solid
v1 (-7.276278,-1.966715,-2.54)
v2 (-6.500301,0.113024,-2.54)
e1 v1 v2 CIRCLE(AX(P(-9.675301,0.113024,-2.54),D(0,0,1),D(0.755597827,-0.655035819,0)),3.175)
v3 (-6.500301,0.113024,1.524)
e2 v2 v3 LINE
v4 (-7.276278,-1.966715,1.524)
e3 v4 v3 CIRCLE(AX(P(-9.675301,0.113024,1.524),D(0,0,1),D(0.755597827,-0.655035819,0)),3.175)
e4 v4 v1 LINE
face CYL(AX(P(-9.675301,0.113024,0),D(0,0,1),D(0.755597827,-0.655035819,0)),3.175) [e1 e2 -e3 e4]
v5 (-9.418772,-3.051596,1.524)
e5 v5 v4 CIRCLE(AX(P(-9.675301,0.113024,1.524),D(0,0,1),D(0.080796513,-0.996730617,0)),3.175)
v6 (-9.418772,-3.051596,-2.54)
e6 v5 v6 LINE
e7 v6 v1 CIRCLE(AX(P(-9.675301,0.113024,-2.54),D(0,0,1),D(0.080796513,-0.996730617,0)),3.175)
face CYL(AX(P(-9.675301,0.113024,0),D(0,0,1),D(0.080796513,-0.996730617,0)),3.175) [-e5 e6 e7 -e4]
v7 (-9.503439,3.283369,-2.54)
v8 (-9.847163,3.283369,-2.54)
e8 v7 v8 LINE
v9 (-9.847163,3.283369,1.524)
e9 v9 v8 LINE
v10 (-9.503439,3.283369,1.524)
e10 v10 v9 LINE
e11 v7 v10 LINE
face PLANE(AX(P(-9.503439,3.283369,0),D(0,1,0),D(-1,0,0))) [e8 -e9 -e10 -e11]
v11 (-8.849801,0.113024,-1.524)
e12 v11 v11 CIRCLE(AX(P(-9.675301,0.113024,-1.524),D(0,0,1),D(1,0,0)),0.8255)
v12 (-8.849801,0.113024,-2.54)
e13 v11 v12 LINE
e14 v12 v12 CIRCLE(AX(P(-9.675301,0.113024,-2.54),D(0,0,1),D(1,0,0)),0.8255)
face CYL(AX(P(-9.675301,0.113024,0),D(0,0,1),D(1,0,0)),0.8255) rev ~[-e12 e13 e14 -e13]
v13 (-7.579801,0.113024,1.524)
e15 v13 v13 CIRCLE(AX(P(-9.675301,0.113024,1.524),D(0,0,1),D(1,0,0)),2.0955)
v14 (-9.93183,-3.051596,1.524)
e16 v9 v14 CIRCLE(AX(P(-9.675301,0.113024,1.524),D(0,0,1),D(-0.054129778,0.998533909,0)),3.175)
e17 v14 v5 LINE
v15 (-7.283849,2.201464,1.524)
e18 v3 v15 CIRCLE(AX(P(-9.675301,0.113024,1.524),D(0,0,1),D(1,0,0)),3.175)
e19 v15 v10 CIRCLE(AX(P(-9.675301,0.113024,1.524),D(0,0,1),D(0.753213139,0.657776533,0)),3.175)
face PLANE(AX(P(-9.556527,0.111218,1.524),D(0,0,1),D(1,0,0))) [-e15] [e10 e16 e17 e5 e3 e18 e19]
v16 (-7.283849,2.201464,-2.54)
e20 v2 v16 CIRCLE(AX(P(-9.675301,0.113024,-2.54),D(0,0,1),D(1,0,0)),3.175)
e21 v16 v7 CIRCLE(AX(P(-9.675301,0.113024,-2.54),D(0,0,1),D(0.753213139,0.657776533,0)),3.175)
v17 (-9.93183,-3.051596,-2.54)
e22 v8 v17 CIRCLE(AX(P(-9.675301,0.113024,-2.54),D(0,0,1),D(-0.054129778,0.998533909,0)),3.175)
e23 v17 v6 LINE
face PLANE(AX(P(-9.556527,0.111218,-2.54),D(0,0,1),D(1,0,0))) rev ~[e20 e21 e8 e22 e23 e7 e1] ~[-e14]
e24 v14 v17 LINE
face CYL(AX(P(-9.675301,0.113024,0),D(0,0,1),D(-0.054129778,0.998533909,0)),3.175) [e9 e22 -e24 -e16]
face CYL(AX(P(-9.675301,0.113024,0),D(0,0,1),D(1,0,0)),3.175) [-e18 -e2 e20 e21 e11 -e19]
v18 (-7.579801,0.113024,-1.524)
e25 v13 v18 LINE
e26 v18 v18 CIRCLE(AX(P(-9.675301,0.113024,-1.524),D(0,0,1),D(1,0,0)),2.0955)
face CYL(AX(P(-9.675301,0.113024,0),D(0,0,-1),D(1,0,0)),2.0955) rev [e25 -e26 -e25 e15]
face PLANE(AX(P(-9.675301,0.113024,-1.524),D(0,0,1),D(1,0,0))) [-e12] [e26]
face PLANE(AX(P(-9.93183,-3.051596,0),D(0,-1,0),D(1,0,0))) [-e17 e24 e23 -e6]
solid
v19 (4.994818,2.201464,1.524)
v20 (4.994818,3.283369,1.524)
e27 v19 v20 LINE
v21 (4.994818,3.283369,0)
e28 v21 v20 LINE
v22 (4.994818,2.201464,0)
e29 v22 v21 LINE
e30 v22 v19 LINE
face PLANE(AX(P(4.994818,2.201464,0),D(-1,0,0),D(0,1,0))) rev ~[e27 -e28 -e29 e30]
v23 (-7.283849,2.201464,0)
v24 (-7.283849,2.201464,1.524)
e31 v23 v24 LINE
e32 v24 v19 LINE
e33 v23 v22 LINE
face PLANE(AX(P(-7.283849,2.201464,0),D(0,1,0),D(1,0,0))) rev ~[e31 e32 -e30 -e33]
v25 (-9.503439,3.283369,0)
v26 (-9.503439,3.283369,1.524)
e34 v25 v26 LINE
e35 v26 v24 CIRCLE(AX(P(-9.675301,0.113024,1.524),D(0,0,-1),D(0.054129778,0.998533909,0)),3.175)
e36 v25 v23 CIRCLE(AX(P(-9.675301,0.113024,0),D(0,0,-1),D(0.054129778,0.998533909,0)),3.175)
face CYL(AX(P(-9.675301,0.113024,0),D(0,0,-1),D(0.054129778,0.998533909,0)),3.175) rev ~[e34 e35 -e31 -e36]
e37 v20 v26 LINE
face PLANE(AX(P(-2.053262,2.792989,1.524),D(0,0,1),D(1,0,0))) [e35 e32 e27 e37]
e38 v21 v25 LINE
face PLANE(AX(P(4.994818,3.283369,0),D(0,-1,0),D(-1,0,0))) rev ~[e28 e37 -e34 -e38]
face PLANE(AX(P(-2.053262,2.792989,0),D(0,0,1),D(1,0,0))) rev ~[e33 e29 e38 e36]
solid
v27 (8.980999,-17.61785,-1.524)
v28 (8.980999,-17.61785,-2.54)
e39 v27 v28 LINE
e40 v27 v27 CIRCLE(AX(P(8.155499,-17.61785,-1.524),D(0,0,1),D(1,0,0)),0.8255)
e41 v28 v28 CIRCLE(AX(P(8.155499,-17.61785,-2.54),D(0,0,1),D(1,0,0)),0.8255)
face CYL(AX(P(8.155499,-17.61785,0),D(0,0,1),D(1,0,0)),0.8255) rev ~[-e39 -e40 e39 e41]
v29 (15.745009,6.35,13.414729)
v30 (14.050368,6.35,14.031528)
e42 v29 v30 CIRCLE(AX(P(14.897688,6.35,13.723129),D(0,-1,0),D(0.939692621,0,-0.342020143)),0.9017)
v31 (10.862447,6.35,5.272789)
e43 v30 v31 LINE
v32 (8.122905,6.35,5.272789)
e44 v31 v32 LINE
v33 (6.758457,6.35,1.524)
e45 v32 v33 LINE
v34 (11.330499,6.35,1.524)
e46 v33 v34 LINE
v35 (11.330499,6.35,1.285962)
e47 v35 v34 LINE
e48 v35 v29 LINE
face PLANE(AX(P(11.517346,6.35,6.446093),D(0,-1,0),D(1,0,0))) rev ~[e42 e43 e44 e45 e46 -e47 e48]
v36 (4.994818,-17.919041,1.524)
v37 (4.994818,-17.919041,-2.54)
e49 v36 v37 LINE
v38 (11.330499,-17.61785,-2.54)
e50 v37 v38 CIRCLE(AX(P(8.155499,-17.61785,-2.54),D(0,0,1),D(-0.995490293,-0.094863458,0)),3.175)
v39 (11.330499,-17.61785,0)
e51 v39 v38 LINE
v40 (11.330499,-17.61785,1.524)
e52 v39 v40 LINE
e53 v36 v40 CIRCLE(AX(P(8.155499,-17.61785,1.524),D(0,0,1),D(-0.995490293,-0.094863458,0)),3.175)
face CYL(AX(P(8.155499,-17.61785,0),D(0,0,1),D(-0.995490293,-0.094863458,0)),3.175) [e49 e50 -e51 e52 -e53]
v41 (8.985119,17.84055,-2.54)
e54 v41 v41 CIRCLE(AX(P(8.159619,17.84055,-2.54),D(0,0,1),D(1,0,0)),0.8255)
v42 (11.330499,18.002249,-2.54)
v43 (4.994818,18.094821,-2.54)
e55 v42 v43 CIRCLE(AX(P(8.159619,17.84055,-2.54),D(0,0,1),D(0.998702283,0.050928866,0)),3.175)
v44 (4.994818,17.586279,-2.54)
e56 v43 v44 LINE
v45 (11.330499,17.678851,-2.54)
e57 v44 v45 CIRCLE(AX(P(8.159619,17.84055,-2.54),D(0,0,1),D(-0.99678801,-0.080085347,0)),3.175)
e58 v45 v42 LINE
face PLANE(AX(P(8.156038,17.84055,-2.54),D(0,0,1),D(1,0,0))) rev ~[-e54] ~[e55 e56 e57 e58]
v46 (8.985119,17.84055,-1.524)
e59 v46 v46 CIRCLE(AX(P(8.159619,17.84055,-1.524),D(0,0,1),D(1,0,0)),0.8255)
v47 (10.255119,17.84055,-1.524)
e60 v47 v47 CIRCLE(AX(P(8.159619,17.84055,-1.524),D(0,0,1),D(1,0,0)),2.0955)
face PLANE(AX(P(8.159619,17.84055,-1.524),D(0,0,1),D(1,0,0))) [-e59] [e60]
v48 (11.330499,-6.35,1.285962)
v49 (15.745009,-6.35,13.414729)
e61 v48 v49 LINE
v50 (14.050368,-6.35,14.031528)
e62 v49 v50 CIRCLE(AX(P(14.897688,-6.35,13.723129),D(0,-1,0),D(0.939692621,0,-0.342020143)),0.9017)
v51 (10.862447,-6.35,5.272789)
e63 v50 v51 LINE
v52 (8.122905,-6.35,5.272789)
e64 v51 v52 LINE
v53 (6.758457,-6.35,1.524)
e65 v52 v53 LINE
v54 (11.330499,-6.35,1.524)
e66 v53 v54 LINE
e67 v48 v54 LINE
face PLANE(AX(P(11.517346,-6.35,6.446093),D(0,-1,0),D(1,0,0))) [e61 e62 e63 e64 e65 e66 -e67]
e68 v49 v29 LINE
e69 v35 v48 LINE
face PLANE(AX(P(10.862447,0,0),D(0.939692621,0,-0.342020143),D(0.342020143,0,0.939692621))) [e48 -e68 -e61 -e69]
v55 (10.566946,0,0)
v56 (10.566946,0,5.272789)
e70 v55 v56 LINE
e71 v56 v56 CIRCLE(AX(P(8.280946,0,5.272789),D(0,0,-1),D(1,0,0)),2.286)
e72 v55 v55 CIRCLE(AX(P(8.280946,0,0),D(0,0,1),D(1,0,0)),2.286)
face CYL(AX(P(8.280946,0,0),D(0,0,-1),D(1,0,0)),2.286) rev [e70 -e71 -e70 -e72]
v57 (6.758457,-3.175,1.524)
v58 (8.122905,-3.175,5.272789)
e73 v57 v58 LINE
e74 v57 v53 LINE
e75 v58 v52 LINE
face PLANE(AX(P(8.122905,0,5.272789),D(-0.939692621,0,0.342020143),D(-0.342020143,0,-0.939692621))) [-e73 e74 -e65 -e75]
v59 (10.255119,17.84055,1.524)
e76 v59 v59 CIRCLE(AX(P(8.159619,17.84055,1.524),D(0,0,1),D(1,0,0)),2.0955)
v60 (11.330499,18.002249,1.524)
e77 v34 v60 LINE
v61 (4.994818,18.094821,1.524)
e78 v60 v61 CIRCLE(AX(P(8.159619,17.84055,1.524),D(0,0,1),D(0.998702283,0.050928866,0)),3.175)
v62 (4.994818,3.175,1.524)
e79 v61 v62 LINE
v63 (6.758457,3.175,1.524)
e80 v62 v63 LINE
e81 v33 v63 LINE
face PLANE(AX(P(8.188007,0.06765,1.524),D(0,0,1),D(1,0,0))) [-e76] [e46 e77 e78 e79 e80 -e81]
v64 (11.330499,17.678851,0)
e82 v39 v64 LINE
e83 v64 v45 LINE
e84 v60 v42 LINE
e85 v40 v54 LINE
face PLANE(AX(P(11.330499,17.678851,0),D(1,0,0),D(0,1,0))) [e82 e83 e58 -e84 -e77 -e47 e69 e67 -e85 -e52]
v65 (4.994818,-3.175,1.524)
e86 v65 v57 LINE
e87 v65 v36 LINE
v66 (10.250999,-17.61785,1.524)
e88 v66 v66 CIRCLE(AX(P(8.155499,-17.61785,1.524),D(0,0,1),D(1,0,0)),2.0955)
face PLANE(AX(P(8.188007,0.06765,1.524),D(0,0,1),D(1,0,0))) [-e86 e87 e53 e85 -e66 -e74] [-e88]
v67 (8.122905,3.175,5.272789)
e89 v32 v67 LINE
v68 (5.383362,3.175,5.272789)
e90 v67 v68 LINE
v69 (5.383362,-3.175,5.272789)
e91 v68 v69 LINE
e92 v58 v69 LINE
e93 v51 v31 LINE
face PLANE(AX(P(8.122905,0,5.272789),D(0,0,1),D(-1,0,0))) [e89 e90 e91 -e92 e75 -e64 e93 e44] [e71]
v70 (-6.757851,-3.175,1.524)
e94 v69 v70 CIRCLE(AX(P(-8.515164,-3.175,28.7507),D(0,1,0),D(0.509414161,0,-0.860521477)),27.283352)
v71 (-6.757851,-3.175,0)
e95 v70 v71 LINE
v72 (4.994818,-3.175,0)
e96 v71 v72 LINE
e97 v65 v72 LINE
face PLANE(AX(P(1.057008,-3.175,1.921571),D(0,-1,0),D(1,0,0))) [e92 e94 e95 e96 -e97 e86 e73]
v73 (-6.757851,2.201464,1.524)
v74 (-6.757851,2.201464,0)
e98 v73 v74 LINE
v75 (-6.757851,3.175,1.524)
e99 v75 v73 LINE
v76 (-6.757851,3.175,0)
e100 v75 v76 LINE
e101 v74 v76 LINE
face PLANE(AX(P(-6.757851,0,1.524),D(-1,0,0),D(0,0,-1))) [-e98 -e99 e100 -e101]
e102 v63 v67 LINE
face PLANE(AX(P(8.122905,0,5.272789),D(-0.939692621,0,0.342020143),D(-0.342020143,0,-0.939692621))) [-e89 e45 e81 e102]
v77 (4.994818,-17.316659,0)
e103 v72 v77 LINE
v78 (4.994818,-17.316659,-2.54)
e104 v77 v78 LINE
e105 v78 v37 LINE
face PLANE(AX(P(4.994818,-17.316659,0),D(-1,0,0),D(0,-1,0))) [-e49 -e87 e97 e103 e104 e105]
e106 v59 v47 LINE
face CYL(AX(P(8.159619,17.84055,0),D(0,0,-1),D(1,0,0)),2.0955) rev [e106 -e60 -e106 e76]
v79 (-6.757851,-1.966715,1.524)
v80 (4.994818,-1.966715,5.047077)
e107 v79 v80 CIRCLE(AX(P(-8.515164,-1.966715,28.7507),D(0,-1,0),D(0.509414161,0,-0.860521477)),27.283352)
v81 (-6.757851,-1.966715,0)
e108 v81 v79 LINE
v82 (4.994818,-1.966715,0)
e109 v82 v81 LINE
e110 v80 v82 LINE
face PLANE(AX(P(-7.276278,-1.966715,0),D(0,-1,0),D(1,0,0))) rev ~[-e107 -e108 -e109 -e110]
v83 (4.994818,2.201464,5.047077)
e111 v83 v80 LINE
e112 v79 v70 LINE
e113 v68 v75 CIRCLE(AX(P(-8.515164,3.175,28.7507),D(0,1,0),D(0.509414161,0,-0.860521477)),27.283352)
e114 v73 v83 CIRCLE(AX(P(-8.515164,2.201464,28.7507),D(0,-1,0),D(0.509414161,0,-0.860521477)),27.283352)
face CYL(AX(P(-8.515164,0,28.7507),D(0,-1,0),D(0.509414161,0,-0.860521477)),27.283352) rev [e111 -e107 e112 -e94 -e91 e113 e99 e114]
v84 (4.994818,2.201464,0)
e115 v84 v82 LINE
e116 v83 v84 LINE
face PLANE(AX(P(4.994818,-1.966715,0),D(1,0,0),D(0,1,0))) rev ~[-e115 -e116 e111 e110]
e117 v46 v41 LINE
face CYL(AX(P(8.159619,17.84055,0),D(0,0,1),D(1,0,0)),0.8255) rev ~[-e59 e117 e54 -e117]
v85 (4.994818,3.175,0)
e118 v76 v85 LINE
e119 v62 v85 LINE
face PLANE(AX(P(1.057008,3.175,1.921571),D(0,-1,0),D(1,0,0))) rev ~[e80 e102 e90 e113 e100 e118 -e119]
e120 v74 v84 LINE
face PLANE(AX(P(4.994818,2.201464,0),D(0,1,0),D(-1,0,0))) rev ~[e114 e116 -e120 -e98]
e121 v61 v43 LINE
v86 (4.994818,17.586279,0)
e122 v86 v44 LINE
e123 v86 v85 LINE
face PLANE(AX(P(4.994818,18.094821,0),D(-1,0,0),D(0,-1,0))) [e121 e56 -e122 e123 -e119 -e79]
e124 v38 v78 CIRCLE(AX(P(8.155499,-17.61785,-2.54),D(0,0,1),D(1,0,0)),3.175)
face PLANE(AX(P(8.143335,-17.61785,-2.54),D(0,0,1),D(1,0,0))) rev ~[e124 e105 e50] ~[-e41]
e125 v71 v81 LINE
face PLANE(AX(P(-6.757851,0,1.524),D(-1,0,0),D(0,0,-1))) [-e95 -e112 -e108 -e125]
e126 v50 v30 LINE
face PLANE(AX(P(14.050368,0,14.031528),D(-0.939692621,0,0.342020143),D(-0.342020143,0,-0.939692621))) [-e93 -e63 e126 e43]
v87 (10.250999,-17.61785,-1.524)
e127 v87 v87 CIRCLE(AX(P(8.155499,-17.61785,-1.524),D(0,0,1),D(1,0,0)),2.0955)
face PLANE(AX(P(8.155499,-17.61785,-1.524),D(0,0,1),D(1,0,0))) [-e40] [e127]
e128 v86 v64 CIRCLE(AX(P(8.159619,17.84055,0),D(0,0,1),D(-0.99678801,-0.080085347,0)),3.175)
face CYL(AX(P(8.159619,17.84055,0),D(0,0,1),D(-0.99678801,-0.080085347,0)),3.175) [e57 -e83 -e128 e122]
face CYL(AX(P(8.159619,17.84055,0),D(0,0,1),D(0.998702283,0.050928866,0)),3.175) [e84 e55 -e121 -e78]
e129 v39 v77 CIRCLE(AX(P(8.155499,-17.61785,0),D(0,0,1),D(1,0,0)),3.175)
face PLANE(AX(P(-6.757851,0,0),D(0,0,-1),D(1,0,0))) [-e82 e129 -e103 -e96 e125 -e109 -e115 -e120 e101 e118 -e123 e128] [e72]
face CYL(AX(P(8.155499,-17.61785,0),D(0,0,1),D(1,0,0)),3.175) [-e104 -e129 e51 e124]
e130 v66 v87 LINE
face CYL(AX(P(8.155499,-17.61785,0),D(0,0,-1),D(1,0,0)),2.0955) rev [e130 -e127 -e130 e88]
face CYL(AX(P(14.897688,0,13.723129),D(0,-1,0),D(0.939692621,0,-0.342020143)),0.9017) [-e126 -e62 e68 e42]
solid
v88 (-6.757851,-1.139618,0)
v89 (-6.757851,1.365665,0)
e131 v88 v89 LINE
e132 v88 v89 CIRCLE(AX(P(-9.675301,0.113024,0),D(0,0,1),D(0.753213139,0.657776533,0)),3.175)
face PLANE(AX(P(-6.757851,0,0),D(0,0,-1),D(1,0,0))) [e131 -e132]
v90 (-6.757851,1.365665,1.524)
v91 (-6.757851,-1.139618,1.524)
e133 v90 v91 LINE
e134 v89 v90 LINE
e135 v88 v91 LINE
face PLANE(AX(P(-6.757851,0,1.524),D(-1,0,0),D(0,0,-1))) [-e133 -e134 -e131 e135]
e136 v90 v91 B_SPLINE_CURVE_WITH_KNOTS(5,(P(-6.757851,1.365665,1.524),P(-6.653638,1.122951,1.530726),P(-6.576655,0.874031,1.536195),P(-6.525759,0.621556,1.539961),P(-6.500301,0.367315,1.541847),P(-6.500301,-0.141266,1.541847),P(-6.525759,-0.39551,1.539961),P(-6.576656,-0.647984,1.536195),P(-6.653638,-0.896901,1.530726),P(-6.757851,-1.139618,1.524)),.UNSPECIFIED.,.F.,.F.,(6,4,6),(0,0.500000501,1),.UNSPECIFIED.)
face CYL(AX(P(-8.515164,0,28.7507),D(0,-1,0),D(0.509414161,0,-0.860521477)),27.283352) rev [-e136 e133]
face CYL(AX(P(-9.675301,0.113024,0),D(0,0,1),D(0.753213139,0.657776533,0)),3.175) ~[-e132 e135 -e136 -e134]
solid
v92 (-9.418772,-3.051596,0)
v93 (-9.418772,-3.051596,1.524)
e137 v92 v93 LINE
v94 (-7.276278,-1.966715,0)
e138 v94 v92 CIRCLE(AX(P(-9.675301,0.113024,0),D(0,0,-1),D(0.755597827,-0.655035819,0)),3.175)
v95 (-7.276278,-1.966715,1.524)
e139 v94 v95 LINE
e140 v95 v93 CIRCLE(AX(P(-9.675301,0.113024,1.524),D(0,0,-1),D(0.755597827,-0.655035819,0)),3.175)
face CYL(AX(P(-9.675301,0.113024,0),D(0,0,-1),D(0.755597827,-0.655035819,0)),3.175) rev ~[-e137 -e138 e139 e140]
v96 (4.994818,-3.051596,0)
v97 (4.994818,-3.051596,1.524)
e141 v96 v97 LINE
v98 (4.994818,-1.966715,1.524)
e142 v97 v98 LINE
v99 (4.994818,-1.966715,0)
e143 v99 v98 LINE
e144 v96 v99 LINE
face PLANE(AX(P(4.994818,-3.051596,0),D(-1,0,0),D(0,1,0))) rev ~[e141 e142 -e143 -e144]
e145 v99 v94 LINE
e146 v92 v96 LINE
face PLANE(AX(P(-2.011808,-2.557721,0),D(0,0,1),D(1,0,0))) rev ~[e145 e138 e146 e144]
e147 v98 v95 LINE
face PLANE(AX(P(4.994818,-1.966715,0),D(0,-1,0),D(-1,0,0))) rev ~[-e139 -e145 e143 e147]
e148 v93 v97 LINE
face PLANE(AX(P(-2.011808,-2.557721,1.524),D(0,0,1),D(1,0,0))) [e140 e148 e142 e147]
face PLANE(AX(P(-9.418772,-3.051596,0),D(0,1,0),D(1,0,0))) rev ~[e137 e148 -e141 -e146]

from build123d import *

# Parameters (mm, degrees)
F0_R      = 2.286
F0_R_2    = 2.0955
F2_DEPTH  = 1.524
F3_DEPTH  = 6.35
F4_DEPTH  = 3.175
F5_DEPTH  = 1.524
F6_DEPTH  = 12.7
F0_R_3    = 0.8255
F7_DEPTH  = 2.54
F8_DEPTH  = 1.524
F9_DEPTH  = 2.54
F10_DEPTH = 1.524
F11_DEPTH = 2.54
F12_DEPTH = 1.524
F13_DEPTH = 25.4


with BuildPart() as f2:
    # F0 (on Top) → F2 (new body)
    with BuildSketch(Plane.XY):
        with BuildLine():
            Line((4.9948175588, 3.2833689949), (4.9948175588, 2.2014643259))
            Line((4.9948175588, 2.2014643259), (4.9948175588, -1.9667148894))
            Line((4.9948175588, -1.9667148894), (4.9948175588, -3.0515958757))
            Line((4.9948175588, -3.0515958757), (4.9948175588, -17.3166585326))
            ThreePointArc((4.9948175588, -17.3166585326), (8.3062650536, -14.4464316119), (11.3304992405, -17.6178500122))
            Line((11.3304992405, -17.6178500122), (11.3304992405, 17.6788508391))
            ThreePointArc((11.3304992405, 17.6788508391), (8.2060050581, 14.6658888438), (4.9948175588, 17.5862790105))
            Line((4.9948175588, 17.5862790105), (4.9948175588, 3.2833689949))
        make_face()
        with Locations((8.2809459418, 0)):
            Circle(F0_R, mode=Mode.SUBTRACT)
        with BuildLine():
            Line((4.9948175588, 18.0948209651), (4.9948175588, 17.5862790105))
            ThreePointArc((4.9948175588, 17.5862790105), (8.2060050581, 14.6658888438), (11.3304992405, 17.6788508391))
            Line((11.3304992405, 17.6788508391), (11.3304992405, 18.0022491365))
            ThreePointArc((11.3304992405, 18.0022491365), (8.2060050581, 21.0152111318), (4.9948175588, 18.0948209651))
        make_face()
        with Locations((8.1596194911, 17.8405499878)):
            Circle(F0_R_2, mode=Mode.SUBTRACT)
        with BuildLine():
            ThreePointArc((11.3304992405, -17.6178500122), (8.3062650536, -14.4464316119), (4.9948175588, -17.3166585326))
            Line((4.9948175588, -17.3166585326), (4.9948175588, -17.9190414918))
            ThreePointArc((4.9948175588, -17.9190414918), (8.3062650536, -20.7892684125), (11.3304992405, -17.6178500122))
        make_face()
        with Locations((8.1554992405, -17.6178500122)):
            Circle(F0_R_2, mode=Mode.SUBTRACT)
    extrude(amount=F2_DEPTH)

    # F1 (on Front) → F3 (join, symmetric)
    with BuildSketch(Plane.XZ):
        with BuildLine():
            Line((10.8624471896, 5.2727888553), (8.1229047444, 5.2727888553))
            Line((8.1229047444, 5.2727888553), (6.2037665495, 0))
            Line((6.2037665495, 0), (10.8624471896, 0))
            Line((10.8624471896, 0), (15.7450092285, 13.4147289508))
            ThreePointArc((15.7450092285, 13.4147289508), (15.2060879556, 14.5704493502), (14.0503675562, 14.0315280773))
            Line((14.0503675562, 14.0315280773), (10.8624471896, 5.2727888553))
        make_face()
    extrude(amount=F3_DEPTH, both=True)

    # F1 (on Front) → F4 (join, symmetric)
    with BuildSketch(Plane.XZ):
        with BuildLine():
            Line((8.1229047444, 5.2727888553), (5.3833622992, 5.2727888553))
            ThreePointArc((5.3833622992, 5.2727888553), (-0.4659601575, 2.6817210776), (-6.7578507587, 1.524))
            Line((-6.7578507587, 1.524), (-6.7578507587, 0))
            Line((-6.7578507587, 0), (5.0566992405, 0))
            Line((5.0566992405, 0), (6.2037665495, 0))
            Line((6.2037665495, 0), (8.1229047444, 5.2727888553))
        make_face()
    extrude(amount=F4_DEPTH, both=True)

    # F0 (on Top) → F6 (cut, symmetric)
    with BuildSketch(Plane.XY):
        with BuildLine():
            ThreePointArc((-7.2838490429, 2.2014643259), (-6.7026349357, 1.2283188177), (-6.5003007595, 0.1130238343))
            ThreePointArc((-6.5003007595, 0.1130238343), (-6.7006139401, -0.9968695509), (-7.2762776581, -1.9667148894))
            Line((-7.2762776581, -1.9667148894), (4.9948175588, -1.9667148894))
            Line((4.9948175588, -1.9667148894), (4.9948175588, 2.2014643259))
            Line((4.9948175588, 2.2014643259), (-7.2838490429, 2.2014643259))
        make_face()
    extrude(amount=F6_DEPTH, both=True, mode=Mode.SUBTRACT)

    # F0 (on Top) → F7 (join)
    with BuildSketch(Plane.XY):
        with BuildLine():
            ThreePointArc((11.3304992405, -17.6178500122), (8.3062650536, -14.4464316119), (4.9948175588, -17.3166585326))
            Line((4.9948175588, -17.3166585326), (4.9948175588, -17.9190414918))
            ThreePointArc((4.9948175588, -17.9190414918), (8.3062650536, -20.7892684125), (11.3304992405, -17.6178500122))
        make_face()
        with Locations((8.1554992405, -17.6178500122)):
            Circle(F0_R_2, mode=Mode.SUBTRACT)
        with Locations((8.1554992405, -17.6178500122)):
            Circle(F0_R_2)
        with Locations((8.1554992405, -17.6178500122)):
            Circle(F0_R_3, mode=Mode.SUBTRACT)
    extrude(amount=-F7_DEPTH)

    # F0 (on Top) → F8 (cut)
    with BuildSketch(Plane.XY):
        with Locations((8.1554992405, -17.6178500122)):
            Circle(F0_R_2)
        with Locations((8.1554992405, -17.6178500122)):
            Circle(F0_R_3, mode=Mode.SUBTRACT)
    extrude(amount=-F8_DEPTH, mode=Mode.SUBTRACT)

    # F0 (on Top) → F11 (join)
    with BuildSketch(Plane.XY):
        with BuildLine():
            Line((4.9948175588, 18.0948209651), (4.9948175588, 17.5862790105))
            ThreePointArc((4.9948175588, 17.5862790105), (8.2060050581, 14.6658888438), (11.3304992405, 17.6788508391))
            Line((11.3304992405, 17.6788508391), (11.3304992405, 18.0022491365))
            ThreePointArc((11.3304992405, 18.0022491365), (8.2060050581, 21.0152111318), (4.9948175588, 18.0948209651))
        make_face()
        with Locations((8.1596194911, 17.8405499878)):
            Circle(F0_R_2, mode=Mode.SUBTRACT)
        with Locations((8.1596194911, 17.8405499878)):
            Circle(F0_R_2)
        with Locations((8.1596194911, 17.8405499878)):
            Circle(F0_R_3, mode=Mode.SUBTRACT)
    extrude(amount=-F11_DEPTH)

    # F0 (on Top) → F12 (cut)
    with BuildSketch(Plane.XY):
        with Locations((8.1596194911, 17.8405499878)):
            Circle(F0_R_2)
        with Locations((8.1596194911, 17.8405499878)):
            Circle(F0_R_3, mode=Mode.SUBTRACT)
    extrude(amount=-F12_DEPTH, mode=Mode.SUBTRACT)

    # F0 (on Top) → F13 (cut)
    with BuildSketch(Plane.XY):
        with Locations((8.2809459418, 0)):
            Circle(F0_R)
    extrude(amount=F13_DEPTH, mode=Mode.SUBTRACT)


with BuildPart() as f2b:
    # F0 (on Top) → F2, piece 2 (new body)
    with BuildSketch(Plane.XY):
        with BuildLine():
            ThreePointArc((-7.2762776581, -1.9667148894), (-6.7006139401, -0.9968695509), (-6.5003007595, 0.1130238343))
            ThreePointArc((-6.5003007595, 0.1130238343), (-6.7026349357, 1.2283188177), (-7.2838490429, 2.2014643259))
            ThreePointArc((-7.2838490429, 2.2014643259), (-8.2841595771, 2.9670300029), (-9.5034387136, 3.2833689949))
            Line((-9.5034387136, 3.2833689949), (-9.8471628054, 3.2833689949))
            ThreePointArc((-9.8471628054, 3.2833689949), (-12.8500172326, 0.1554539585), (-9.9318296879, -3.0515958757))
            Line((-9.9318296879, -3.0515958757), (-9.4187718311, -3.0515958757))
            ThreePointArc((-9.4187718311, -3.0515958757), (-8.2409957591, -2.7195358148), (-7.2762776581, -1.9667148894))
        make_face()
        with Locations((-9.6753007595, 0.1130238343)):
            Circle(F0_R_2, mode=Mode.SUBTRACT)
    extrude(amount=F2_DEPTH)

    # F0 (on Top) → F9 (join)
    with BuildSketch(Plane.XY):
        with BuildLine():
            ThreePointArc((-7.2762776581, -1.9667148894), (-6.7006139401, -0.9968695509), (-6.5003007595, 0.1130238343))
            ThreePointArc((-6.5003007595, 0.1130238343), (-6.7026349357, 1.2283188177), (-7.2838490429, 2.2014643259))
            ThreePointArc((-7.2838490429, 2.2014643259), (-8.2841595771, 2.9670300029), (-9.5034387136, 3.2833689949))
            Line((-9.5034387136, 3.2833689949), (-9.8471628054, 3.2833689949))
            ThreePointArc((-9.8471628054, 3.2833689949), (-12.8500172326, 0.1554539585), (-9.9318296879, -3.0515958757))
            Line((-9.9318296879, -3.0515958757), (-9.4187718311, -3.0515958757))
            ThreePointArc((-9.4187718311, -3.0515958757), (-8.2409957591, -2.7195358148), (-7.2762776581, -1.9667148894))
        make_face()
        with Locations((-9.6753007595, 0.1130238343)):
            Circle(F0_R_2, mode=Mode.SUBTRACT)
        with Locations((-9.6753007595, 0.1130238343)):
            Circle(F0_R_2)
        with Locations((-9.6753007595, 0.1130238343)):
            Circle(F0_R_3, mode=Mode.SUBTRACT)
    extrude(amount=-F9_DEPTH)

    # F0 (on Top) → F10 (cut)
    with BuildSketch(Plane.XY):
        with Locations((-9.6753007595, 0.1130238343)):
            Circle(F0_R_2)
        with Locations((-9.6753007595, 0.1130238343)):
            Circle(F0_R_3, mode=Mode.SUBTRACT)
    extrude(amount=-F10_DEPTH, mode=Mode.SUBTRACT)


with BuildPart() as f5:
    # F0 (on Top) → F5 (new body)
    with BuildSketch(Plane.XY):
        with BuildLine():
            ThreePointArc((-9.5034387136, 3.2833689949), (-8.2841595771, 2.9670300029), (-7.2838490429, 2.2014643259))
            Line((-7.2838490429, 2.2014643259), (4.9948175588, 2.2014643259))
            Line((4.9948175588, 2.2014643259), (4.9948175588, 3.2833689949))
            Line((4.9948175588, 3.2833689949), (-9.5034387136, 3.2833689949))
        make_face()
    extrude(amount=F5_DEPTH)


with BuildPart() as f5b:
    # F0 (on Top) → F5, piece 2 (new body)
    with BuildSketch(Plane.XY):
        with BuildLine():
            Line((4.9948175588, -1.9667148894), (-7.2762776581, -1.9667148894))
            ThreePointArc((-7.2762776581, -1.9667148894), (-8.2409957591, -2.7195358148), (-9.4187718311, -3.0515958757))
            Line((-9.4187718311, -3.0515958757), (4.9948175588, -3.0515958757))
            Line((4.9948175588, -3.0515958757), (4.9948175588, -1.9667148894))
        make_face()
    extrude(amount=F5_DEPTH)


solid = Compound([f2.part, f2b.part, f5.part, f5b.part])
